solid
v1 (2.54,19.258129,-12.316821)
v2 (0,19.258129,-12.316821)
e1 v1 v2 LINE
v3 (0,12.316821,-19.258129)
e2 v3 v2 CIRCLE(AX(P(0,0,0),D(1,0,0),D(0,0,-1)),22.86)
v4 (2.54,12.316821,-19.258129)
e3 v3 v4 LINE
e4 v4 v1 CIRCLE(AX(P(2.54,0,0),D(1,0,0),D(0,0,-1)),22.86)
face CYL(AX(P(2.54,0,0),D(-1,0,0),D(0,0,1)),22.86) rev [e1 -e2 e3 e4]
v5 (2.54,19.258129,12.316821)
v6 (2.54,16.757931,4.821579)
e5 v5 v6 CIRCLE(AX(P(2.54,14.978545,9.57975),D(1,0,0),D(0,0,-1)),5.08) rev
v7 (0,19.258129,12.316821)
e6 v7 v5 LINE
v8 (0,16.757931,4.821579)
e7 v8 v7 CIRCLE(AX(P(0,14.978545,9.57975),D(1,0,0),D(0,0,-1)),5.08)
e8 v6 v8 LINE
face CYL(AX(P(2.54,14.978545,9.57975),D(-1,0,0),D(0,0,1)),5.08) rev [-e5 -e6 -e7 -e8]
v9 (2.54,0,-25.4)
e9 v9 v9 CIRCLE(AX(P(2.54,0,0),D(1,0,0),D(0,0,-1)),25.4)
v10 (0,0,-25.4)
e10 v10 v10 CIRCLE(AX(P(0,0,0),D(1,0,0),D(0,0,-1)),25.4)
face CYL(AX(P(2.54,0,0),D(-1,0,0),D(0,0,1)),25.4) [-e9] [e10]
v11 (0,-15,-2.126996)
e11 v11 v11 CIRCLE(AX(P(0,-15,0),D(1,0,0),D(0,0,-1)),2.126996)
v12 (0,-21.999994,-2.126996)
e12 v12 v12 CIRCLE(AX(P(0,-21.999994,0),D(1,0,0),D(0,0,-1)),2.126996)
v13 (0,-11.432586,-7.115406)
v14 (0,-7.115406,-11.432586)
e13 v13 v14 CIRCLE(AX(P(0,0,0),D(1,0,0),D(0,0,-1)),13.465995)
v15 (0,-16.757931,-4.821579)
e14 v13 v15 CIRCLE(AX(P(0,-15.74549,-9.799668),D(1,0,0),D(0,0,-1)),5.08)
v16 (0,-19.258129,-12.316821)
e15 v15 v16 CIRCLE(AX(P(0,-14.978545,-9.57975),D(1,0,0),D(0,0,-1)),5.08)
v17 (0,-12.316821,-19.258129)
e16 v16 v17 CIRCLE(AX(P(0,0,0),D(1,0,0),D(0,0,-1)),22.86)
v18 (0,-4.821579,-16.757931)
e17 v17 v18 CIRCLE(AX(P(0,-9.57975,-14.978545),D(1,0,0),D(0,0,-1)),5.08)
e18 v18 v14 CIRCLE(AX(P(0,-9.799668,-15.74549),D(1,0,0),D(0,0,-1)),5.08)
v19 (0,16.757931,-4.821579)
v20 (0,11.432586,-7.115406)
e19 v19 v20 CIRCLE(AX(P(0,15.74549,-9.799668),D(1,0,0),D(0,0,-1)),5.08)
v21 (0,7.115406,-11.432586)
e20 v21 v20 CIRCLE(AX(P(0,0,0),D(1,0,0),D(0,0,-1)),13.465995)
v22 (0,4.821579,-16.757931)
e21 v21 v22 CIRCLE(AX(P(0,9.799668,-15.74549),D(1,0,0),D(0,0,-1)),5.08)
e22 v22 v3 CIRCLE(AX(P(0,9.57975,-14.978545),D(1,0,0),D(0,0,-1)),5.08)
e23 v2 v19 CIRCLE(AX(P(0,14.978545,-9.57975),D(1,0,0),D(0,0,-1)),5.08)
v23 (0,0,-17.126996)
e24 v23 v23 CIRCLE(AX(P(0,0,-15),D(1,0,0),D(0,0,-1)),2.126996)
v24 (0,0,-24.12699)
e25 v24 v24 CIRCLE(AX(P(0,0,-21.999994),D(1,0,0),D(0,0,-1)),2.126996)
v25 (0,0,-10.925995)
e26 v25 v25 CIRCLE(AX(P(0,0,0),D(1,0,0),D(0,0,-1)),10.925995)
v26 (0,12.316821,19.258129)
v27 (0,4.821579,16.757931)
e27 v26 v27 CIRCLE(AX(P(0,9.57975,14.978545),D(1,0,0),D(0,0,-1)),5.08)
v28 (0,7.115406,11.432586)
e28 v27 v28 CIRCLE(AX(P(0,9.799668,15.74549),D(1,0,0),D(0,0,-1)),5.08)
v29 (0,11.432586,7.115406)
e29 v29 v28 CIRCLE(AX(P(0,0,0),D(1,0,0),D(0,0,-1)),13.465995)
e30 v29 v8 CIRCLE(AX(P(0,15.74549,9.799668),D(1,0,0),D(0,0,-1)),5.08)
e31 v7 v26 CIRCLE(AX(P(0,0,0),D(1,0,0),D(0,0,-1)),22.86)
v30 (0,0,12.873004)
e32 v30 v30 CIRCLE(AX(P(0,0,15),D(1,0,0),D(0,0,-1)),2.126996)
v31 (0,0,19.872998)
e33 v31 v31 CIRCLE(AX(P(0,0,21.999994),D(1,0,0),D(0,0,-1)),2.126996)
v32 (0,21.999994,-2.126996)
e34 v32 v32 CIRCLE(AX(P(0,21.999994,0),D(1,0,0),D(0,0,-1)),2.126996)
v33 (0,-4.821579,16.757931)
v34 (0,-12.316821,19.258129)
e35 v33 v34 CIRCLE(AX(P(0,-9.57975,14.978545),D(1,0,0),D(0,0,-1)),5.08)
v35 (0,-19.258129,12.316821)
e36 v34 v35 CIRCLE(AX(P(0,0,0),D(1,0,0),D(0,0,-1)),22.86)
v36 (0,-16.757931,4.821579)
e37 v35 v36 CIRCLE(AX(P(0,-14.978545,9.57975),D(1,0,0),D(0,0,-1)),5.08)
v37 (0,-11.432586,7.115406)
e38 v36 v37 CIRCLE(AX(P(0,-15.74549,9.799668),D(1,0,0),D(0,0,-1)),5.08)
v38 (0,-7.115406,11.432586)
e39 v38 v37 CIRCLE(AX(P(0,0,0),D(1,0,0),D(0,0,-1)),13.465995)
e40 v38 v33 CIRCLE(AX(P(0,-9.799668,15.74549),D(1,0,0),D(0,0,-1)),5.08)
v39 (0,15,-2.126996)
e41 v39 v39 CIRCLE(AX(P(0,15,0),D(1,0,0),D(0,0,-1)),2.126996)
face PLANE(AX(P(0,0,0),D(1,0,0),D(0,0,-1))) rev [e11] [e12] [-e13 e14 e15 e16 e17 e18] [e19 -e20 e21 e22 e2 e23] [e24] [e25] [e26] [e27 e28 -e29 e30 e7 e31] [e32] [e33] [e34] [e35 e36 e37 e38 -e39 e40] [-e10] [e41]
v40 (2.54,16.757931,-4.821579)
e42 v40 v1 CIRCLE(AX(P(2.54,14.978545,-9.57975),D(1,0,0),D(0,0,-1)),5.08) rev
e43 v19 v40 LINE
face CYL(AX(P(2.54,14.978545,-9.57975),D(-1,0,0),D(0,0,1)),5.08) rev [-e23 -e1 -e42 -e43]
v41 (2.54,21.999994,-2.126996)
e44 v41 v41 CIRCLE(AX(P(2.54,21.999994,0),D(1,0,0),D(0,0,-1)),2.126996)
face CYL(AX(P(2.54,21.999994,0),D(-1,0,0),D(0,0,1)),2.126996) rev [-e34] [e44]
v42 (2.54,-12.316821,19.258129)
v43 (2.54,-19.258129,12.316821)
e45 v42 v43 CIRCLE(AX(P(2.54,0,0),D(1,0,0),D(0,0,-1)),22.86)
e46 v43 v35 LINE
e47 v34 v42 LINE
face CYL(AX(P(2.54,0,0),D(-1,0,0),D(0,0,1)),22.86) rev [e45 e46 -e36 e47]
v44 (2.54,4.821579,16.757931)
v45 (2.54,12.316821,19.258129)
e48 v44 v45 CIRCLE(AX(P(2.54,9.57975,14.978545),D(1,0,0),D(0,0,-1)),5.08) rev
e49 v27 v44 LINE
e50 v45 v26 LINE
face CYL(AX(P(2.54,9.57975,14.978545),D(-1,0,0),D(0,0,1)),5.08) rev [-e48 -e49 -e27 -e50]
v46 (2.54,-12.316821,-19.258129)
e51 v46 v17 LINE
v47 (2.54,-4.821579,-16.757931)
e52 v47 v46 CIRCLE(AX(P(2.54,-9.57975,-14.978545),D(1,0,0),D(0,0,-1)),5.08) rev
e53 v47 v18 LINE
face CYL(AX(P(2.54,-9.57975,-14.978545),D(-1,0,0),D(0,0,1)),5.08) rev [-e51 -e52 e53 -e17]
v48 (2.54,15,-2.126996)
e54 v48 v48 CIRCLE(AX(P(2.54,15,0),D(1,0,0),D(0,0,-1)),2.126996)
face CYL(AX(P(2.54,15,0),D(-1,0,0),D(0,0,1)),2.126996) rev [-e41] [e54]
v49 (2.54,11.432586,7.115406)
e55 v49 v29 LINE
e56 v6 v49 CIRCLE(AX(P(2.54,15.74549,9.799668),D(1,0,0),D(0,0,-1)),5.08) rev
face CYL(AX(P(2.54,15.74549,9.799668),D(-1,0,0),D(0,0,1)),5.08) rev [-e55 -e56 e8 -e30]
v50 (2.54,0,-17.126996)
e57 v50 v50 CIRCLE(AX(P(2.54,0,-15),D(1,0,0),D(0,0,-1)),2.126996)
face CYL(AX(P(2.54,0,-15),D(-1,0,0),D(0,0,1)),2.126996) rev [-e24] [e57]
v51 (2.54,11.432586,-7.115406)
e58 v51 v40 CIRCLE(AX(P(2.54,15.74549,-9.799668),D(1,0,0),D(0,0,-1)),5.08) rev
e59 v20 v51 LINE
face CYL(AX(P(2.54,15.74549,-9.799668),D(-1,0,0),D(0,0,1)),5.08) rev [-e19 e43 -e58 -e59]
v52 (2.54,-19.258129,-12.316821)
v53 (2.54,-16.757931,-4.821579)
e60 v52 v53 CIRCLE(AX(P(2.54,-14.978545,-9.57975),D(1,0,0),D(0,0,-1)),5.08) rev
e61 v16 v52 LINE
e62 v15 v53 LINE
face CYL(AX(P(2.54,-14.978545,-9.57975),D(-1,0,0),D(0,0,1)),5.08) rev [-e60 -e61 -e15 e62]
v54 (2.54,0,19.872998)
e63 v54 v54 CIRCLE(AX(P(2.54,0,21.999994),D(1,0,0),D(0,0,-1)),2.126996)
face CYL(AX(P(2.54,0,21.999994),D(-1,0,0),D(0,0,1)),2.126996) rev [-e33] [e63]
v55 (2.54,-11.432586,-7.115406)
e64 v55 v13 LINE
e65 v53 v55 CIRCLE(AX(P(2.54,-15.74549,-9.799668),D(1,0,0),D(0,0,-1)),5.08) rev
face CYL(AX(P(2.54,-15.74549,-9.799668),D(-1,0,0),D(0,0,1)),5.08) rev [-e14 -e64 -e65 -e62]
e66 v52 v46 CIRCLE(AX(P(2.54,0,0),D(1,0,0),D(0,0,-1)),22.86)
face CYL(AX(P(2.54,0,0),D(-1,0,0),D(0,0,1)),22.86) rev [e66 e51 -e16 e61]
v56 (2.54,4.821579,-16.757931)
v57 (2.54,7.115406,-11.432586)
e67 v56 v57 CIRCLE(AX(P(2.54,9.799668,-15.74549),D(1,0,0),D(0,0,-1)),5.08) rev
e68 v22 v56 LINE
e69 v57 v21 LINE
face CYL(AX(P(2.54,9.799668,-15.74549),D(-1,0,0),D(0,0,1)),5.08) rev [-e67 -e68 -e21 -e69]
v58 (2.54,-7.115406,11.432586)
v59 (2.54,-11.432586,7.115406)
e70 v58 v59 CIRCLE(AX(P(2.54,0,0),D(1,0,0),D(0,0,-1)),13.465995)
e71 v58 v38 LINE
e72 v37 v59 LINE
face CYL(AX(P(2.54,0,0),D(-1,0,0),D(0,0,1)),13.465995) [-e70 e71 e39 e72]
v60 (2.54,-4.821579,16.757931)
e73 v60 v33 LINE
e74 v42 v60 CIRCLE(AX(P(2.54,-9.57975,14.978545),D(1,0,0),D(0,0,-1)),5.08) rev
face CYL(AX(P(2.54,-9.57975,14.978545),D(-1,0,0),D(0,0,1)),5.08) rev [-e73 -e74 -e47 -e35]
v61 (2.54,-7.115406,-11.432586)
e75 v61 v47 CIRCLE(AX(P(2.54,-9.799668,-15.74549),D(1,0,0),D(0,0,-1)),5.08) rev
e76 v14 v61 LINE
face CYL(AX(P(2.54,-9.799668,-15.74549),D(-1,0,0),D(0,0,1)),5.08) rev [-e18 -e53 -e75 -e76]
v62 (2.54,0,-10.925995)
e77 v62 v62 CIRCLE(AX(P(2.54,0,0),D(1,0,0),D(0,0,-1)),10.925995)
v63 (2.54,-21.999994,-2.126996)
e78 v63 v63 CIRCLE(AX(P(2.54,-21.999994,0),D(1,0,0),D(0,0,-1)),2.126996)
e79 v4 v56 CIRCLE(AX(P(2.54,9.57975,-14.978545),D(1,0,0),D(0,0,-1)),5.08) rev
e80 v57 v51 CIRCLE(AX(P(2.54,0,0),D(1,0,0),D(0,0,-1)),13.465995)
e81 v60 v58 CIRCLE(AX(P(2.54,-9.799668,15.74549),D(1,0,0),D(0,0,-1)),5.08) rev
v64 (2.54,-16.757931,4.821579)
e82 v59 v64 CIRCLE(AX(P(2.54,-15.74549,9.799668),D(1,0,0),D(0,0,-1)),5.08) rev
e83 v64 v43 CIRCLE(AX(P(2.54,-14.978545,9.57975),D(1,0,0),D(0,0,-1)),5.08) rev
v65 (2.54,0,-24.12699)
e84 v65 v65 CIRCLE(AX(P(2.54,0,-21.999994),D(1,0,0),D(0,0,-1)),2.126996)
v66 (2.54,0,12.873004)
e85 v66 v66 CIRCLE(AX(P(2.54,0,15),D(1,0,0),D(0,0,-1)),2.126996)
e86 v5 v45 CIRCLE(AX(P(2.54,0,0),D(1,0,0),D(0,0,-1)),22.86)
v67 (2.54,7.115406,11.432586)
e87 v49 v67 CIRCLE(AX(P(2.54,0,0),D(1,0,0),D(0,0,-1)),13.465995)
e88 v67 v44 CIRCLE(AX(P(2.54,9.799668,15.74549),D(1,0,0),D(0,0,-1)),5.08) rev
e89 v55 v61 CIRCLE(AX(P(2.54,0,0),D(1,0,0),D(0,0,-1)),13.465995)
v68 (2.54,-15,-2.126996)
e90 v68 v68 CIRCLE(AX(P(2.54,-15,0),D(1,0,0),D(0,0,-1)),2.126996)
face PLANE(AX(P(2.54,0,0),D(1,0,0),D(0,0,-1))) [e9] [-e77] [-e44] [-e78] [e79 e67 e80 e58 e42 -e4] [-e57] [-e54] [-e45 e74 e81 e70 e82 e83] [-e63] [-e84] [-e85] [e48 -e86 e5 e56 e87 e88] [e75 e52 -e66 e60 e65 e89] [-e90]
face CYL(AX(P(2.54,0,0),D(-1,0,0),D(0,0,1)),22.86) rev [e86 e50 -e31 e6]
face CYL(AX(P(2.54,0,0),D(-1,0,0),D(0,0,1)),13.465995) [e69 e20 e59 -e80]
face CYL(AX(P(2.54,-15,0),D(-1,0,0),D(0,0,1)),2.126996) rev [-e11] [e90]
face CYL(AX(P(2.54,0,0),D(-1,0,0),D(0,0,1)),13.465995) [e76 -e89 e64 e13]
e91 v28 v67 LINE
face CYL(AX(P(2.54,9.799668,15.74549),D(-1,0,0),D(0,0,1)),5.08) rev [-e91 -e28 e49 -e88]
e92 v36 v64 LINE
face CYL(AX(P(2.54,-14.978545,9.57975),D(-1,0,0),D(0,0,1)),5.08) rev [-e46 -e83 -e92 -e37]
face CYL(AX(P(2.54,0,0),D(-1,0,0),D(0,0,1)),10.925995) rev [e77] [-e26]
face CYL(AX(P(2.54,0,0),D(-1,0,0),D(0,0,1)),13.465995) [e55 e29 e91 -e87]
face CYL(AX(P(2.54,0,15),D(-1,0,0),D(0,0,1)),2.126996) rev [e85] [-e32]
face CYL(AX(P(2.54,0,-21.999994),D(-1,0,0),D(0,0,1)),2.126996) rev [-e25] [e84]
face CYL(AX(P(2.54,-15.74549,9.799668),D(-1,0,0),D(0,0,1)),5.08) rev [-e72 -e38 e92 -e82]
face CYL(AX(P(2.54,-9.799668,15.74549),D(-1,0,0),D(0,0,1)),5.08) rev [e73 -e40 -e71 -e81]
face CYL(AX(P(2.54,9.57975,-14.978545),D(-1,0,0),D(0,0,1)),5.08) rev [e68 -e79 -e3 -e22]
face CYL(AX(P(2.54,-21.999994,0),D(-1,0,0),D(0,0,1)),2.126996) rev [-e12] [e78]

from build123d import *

# Parameters (mm, degrees)
SKETCH1_R           = 25.4
SKETCH1_R_2         = 2.126996
SKETCH1_R_3         = 10.925995089
BOSS_EXTRUDE1_DEPTH = 2.54
FILLET1_R           = 5.08


with BuildPart() as part:
    # Sketch1 → Boss-Extrude1 (new body)
    with BuildSketch(Plane(origin=(0, 0, 0), x_dir=(0, 0, -1), z_dir=(1, 0, 0))):
        Circle(SKETCH1_R)
        with Locations((0, 21.9999941)):
            Circle(SKETCH1_R_2, mode=Mode.SUBTRACT)
        with Locations((14.999999972, 0)):
            Circle(SKETCH1_R_2, mode=Mode.SUBTRACT)
        with Locations((21.9999941, 0)):
            Circle(SKETCH1_R_2, mode=Mode.SUBTRACT)
        with Locations((0, -21.9999941)):
            Circle(SKETCH1_R_2, mode=Mode.SUBTRACT)
        with Locations((-21.9999941, 0)):
            Circle(SKETCH1_R_2, mode=Mode.SUBTRACT)
        with Locations((0, -14.999999972)):
            Circle(SKETCH1_R_2, mode=Mode.SUBTRACT)
        with Locations((-14.999999972, 0)):
            Circle(SKETCH1_R_2, mode=Mode.SUBTRACT)
        with Locations((0, 14.999999972)):
            Circle(SKETCH1_R_2, mode=Mode.SUBTRACT)
        Circle(SKETCH1_R_3, mode=Mode.SUBTRACT)
        with BuildLine():
            Line((12.944345277, 3.71173128), (21.974442369, 6.301069954))
            ThreePointArc((21.974442369, 6.301069954), (16.164461018, 16.164461018), (6.301069954, 21.974442369))
            Line((6.301069954, 21.974442369), (3.71173128, 12.944345277))
            ThreePointArc((3.71173128, 12.944345277), (9.521896443, 9.521896443), (12.944345277, 3.71173128))
        make_face(mode=Mode.SUBTRACT)
        with BuildLine():
            Line((-12.944345277, 3.71173128), (-21.974442369, 6.301069954))
            ThreePointArc((-21.974442369, 6.301069954), (-16.164461018, 16.164461018), (-6.301069954, 21.974442369))
            Line((-6.301069954, 21.974442369), (-3.71173128, 12.944345277))
            ThreePointArc((-3.71173128, 12.944345277), (-9.521896443, 9.521896443), (-12.944345277, 3.71173128))
        make_face(mode=Mode.SUBTRACT)
        with BuildLine():
            Line((3.71173128, -12.944345277), (6.301069954, -21.974442369))
            ThreePointArc((6.301069954, -21.974442369), (16.164461018, -16.164461018), (21.974442369, -6.301069954))
            Line((21.974442369, -6.301069954), (12.944345277, -3.71173128))
            ThreePointArc((12.944345277, -3.71173128), (9.521896443, -9.521896443), (3.71173128, -12.944345277))
        make_face(mode=Mode.SUBTRACT)
        with BuildLine():
            Line((-12.944345277, -3.71173128), (-21.974442369, -6.301069954))
            ThreePointArc((-21.974442369, -6.301069954), (-16.164461018, -16.164461018), (-6.301069954, -21.974442369))
            Line((-6.301069954, -21.974442369), (-3.71173128, -12.944345277))
            ThreePointArc((-3.71173128, -12.944345277), (-9.521896443, -9.521896443), (-12.944345277, -3.71173128))
        make_face(mode=Mode.SUBTRACT)
    extrude(amount=BOSS_EXTRUDE1_DEPTH)

    # Fillet1
    # the kernel refuses this fillet: 5.08 mm, written as the material it adds along each edge
    with BuildSketch(Plane(origin=(0, 6.301069954, -21.974442369), x_dir=(0, 0.911397711724722, 0.41152668329397635), z_dir=(1, 0, 0)), Plane(origin=(0, -21.974442369, -6.301069954), x_dir=(0, 0.4115266832939732, -0.9113977117247234), z_dir=(1, 0, 0)), Plane(origin=(0, -6.301069954, 21.974442369), x_dir=(0, -0.9113977117247248, -0.4115266832939699), z_dir=(1, 0, 0))) as fillet1_piece_1:
        with BuildLine():
            CenterArc((5.867179819, 5.026781091), FILLET1_R, 171.6992252, 106.601549599)
            Line((0.840398727, 5.760178569), (0, 0))
            ThreePointArc((0, 0), (3.300288648, -0.239485089), (6.600577296, 0))
        make_face()
    extrude(amount=2.54)
    with BuildSketch(Plane(origin=(0, 3.71173128, -12.944345277), x_dir=(0, 0.9139096848416328, 0.4059175876365389), z_dir=(1, 0, 0))) as fillet1_piece_2:
        with BuildLine():
            CenterArc((4.426790217, -5.031193515), FILLET1_R, 97.948640691, 74.102718618)
            Line((-0.604403297, -4.328703786), (0, 0))
            ThreePointArc((0, 0), (1.862150244, -0.12937557), (3.724300488, 0))
        make_face()
    extrude(amount=2.54)
    with BuildSketch(Plane(origin=(0, 12.944345277, -3.71173128), x_dir=(0, -0.40591758763655106, -0.9139096848416274), z_dir=(1, 0, 0)), Plane(origin=(0, -12.944345277, 3.71173128), x_dir=(0, 0.4059175876365596, 0.9139096848416237), z_dir=(1, 0, 0)), Plane(origin=(0, 3.71173128, 12.944345277), x_dir=(0, 0.9139096848416286, -0.4059175876365486), z_dir=(1, 0, 0))) as fillet1_piece_3:
        with BuildLine():
            CenterArc((4.426790217, 5.031193515), FILLET1_R, 187.948640691, 74.102718618)
            Line((-0.604403297, 4.328703786), (0, 0))
            ThreePointArc((0, 0), (1.862150244, 0.12937557), (3.724300488, 0))
        make_face()
    extrude(amount=2.54)
    with BuildSketch(Plane(origin=(0, 21.974442369, -6.301069954), x_dir=(0, -0.9612616959383177, 0.275637355817003), z_dir=(1, 0, 0)), Plane(origin=(0, -6.301069954, -21.974442369), x_dir=(0, 0.2756373558170063, 0.9612616959383169), z_dir=(1, 0, 0)), Plane(origin=(0, 6.301069954, 21.974442369), x_dir=(0, -0.27563735581699955, -0.9612616959383188), z_dir=(1, 0, 0))) as fillet1_piece_4:
        with BuildLine():
            CenterArc((5.821162011, 5.08), FILLET1_R, 163.398450401, 106.601549599)
            ThreePointArc((0.952922586, 6.531428571), (0.239485089, 3.300288648), (0, 0))
            Line((0, 0), (5.821162011, 0))
        make_face()
    extrude(amount=2.54)
    with BuildSketch(Plane(origin=(0, -3.71173128, -12.944345277), x_dir=(0, -0.2756373558170063, -0.9612616959383169), z_dir=(1, 0, 0))) as fillet1_piece_5:
        with BuildLine():
            CenterArc((4.370695575, -5.08), FILLET1_R, 90, 74.102718618)
            ThreePointArc((-0.515016307, -3.688518989), (-0.12937557, -1.862150244), (0, 0))
            Line((0, 0), (4.370695575, 0))
        make_face()
    extrude(amount=2.54)
    with BuildSketch(Plane(origin=(0, -12.944345277, -3.71173128), x_dir=(0, -0.9612616959383224, -0.2756373558169866), z_dir=(1, 0, 0)), Plane(origin=(0, -3.71173128, 12.944345277), x_dir=(0, -0.27563735581698295, 0.9612616959383236), z_dir=(1, 0, 0)), Plane(origin=(0, 12.944345277, 3.71173128), x_dir=(0, 0.9612616959383206, 0.2756373558169933), z_dir=(1, 0, 0))) as fillet1_piece_6:
        with BuildLine():
            CenterArc((4.370695575, 5.08), FILLET1_R, 195.897281382, 74.102718618)
            ThreePointArc((-0.515016307, 3.688518989), (-0.12937557, 1.862150244), (0, 0))
            Line((0, 0), (4.370695575, 0))
        make_face()
    extrude(amount=2.54)
    with BuildSketch(Plane(origin=(0, -21.974442369, 6.301069954), x_dir=(0, 0.41152668329399555, 0.9113977117247133), z_dir=(1, 0, 0))) as fillet1_piece_7:
        with BuildLine():
            CenterArc((5.867179819, -5.026781091), FILLET1_R, 81.6992252, 106.601549599)
            Line((0.840398727, -5.760178569), (0, 0))
            ThreePointArc((0, 0), (3.300288648, 0.239485089), (6.600577296, 0))
        make_face()
    extrude(amount=2.54)
    with BuildSketch(Plane(origin=(0, 21.974442369, 6.301069954), x_dir=(0, -0.9612616959383207, -0.27563735581699317), z_dir=(1, 0, 0))) as fillet1_piece_8:
        with BuildLine():
            CenterArc((5.821162011, -5.08), FILLET1_R, 90, 106.601549599)
            ThreePointArc((0.952922586, -6.531428571), (0.239485089, -3.300288648), (0, 0))
            Line((0, 0), (5.821162011, 0))
        make_face()
    extrude(amount=2.54)


solid = part.part
